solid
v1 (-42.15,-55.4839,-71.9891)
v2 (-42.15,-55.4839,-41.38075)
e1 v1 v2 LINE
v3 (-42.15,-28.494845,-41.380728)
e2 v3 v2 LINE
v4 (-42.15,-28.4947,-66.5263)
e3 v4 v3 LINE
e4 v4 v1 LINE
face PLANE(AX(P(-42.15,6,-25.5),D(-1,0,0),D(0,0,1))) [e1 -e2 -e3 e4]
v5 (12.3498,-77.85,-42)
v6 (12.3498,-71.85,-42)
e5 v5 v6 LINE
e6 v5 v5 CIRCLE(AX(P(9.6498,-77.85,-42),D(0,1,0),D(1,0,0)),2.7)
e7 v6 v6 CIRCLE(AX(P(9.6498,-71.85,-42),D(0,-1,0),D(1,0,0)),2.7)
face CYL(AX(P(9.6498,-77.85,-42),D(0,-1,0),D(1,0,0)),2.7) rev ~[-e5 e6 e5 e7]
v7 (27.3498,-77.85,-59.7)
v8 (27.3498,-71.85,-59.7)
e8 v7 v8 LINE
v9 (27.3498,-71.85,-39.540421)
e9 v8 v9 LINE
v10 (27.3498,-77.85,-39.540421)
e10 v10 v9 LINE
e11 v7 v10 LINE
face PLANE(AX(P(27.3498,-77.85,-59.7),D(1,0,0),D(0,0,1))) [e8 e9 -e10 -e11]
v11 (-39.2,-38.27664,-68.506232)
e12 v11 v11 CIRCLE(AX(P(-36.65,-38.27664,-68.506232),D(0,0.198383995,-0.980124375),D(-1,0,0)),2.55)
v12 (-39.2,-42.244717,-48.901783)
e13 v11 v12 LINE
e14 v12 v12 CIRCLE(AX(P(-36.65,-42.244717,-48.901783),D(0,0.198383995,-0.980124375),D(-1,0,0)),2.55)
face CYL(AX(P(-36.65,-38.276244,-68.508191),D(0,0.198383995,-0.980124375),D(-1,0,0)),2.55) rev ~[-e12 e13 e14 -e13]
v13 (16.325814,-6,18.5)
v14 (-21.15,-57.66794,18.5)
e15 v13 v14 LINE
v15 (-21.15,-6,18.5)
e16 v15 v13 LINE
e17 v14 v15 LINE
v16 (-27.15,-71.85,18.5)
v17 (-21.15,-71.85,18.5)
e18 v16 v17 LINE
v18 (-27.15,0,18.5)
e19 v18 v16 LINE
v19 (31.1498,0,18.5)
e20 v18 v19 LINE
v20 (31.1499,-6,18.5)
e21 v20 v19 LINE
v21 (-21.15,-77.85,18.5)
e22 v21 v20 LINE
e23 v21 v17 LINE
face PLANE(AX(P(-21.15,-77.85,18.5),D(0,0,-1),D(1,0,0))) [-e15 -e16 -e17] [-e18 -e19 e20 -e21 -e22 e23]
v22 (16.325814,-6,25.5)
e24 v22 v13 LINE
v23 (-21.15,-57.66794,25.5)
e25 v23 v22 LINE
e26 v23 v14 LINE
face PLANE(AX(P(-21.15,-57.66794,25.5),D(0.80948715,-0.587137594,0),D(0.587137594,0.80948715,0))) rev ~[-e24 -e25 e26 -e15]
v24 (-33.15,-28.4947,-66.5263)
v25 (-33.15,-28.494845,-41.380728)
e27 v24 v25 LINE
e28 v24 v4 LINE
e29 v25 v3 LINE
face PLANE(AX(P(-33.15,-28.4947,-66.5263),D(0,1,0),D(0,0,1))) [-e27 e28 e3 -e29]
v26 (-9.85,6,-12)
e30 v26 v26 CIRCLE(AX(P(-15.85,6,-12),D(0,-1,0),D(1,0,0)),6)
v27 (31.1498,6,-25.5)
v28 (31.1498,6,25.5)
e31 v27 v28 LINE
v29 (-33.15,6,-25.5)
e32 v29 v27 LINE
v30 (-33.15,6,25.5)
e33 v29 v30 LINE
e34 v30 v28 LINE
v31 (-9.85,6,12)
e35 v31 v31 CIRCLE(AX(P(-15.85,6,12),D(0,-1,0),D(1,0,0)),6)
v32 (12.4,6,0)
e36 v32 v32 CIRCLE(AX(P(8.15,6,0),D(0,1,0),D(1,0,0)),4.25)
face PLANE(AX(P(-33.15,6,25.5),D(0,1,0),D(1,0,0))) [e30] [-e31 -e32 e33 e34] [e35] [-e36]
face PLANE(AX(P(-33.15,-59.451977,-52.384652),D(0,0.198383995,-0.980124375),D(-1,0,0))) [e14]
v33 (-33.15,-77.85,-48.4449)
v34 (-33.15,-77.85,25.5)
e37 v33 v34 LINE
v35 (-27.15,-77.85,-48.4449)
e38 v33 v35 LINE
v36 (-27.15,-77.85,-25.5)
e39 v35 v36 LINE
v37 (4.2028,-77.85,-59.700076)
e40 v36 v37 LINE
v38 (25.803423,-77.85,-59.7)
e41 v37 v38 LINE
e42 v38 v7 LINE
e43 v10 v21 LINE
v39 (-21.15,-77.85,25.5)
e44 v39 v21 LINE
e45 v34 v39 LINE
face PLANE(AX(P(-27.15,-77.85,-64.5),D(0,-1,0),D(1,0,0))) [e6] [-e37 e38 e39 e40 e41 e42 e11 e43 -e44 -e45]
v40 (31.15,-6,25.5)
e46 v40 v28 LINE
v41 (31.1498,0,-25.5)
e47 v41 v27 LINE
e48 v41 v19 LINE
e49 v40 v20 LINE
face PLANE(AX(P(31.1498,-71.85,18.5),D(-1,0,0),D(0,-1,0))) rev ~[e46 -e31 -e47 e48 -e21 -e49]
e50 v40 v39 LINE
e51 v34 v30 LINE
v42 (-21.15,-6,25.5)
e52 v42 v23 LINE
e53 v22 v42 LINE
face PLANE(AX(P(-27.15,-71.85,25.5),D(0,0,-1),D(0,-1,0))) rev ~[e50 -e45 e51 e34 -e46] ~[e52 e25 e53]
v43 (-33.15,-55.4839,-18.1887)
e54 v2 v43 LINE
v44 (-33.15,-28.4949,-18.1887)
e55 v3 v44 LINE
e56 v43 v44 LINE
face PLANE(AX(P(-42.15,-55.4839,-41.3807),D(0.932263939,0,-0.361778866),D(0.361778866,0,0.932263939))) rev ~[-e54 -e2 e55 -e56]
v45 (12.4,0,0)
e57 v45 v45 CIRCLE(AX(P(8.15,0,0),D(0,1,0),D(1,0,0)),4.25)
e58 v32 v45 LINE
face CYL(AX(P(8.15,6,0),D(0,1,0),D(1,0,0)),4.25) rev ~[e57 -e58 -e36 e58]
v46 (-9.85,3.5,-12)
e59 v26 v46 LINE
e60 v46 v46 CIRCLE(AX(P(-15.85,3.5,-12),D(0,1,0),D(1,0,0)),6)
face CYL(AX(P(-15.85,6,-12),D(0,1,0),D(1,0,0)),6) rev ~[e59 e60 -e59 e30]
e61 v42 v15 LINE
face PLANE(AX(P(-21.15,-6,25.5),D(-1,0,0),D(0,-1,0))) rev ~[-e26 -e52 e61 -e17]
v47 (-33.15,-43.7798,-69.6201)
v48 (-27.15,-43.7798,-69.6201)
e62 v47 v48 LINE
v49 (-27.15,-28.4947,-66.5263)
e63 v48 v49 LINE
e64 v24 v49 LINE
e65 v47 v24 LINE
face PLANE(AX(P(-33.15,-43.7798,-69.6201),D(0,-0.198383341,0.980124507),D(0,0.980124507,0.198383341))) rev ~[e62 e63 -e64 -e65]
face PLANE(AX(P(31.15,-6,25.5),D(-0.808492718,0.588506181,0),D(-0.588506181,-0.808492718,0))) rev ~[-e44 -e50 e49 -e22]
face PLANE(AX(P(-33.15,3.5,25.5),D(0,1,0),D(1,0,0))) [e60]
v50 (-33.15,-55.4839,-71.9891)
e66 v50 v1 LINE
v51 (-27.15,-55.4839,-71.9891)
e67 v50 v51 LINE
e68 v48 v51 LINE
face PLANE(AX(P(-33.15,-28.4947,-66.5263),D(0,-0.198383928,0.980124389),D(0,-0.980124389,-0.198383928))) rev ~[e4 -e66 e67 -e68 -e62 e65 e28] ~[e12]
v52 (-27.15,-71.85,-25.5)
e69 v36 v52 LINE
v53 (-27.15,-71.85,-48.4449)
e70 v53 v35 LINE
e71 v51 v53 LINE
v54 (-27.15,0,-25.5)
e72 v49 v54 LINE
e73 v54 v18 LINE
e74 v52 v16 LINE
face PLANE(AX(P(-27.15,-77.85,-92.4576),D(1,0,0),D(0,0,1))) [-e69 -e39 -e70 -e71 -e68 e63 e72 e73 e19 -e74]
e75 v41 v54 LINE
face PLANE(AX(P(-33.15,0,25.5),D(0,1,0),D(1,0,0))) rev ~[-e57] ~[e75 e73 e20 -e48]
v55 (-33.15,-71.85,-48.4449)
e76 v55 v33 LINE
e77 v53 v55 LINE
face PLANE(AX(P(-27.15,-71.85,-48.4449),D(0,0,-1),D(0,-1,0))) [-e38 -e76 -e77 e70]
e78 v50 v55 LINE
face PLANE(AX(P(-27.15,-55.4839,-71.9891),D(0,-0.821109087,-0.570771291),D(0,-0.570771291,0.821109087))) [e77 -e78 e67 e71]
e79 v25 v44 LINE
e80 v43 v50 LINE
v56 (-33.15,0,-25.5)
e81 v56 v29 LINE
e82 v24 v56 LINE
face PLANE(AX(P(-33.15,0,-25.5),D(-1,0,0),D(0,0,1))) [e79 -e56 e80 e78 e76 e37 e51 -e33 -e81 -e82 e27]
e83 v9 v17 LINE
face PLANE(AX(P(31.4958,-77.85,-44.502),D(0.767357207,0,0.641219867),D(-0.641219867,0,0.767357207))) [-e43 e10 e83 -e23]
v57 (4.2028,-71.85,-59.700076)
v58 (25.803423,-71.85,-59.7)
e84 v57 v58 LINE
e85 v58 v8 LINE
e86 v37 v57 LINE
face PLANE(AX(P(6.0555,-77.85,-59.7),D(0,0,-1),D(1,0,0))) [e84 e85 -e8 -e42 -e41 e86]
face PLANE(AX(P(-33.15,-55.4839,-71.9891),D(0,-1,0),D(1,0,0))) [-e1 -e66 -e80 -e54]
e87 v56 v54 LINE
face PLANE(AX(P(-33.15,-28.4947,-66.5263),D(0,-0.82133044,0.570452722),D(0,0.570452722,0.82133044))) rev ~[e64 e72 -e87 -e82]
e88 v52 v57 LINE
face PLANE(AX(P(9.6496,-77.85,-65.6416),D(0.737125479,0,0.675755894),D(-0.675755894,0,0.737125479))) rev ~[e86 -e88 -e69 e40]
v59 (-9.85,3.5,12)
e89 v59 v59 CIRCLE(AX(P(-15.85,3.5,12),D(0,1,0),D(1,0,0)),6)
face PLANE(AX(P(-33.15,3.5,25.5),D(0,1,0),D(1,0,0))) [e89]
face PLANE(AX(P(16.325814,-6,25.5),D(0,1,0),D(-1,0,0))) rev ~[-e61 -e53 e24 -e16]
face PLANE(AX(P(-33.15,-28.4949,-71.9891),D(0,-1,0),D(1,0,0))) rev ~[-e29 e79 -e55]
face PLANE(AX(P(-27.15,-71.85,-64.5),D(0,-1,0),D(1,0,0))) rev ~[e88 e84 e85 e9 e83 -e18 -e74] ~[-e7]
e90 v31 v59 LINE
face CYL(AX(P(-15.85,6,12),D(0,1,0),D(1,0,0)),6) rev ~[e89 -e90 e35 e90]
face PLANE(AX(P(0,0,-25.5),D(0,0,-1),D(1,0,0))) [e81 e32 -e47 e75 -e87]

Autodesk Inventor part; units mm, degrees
ref_plane "YZ Plane" through (0, 0, 0) normal (1, 0, 0) x (0, 1, 0)
ref_plane "XZ Plane" through (0, 0, 0) normal (0, 1, 0) x (-1, 0, 0)
ref_plane "XY Plane" through (0, 0, 0) normal (0, 0, 1) x (1, 0, 0)
sketch "Sketch1" plane through (0, 0, 0) normal (0, 1, 0) x (-1, 0, 0)
  line L0 (0, -25.5) -> (-34.15, -25.5)
  line L1 (-34.15, -25.5) -> (-34.15, 0)
  line L2 (-34.15, 0) -> (-34.15, 25.5)
  line L3 (-34.15, 25.5) -> (0, 25.5)
  line L4 (0, 25.5) -> (34.15, 25.5)
  line L5 (34.15, 25.5) -> (34.15, 0)
  line L6 (34.15, 0) -> (34.15, -25.5)
  line L7 (34.15, -25.5) -> (0, -25.5)
  point P0 (0, 0)
extrude "Extrusion1" add sketch "Sketch1" along normal blind 7
sketch "Sketch3" plane through (-34.15, 0, 25.5) normal (0, 0, 1) x (1, 0, 0)
  line L0 (0, 0) -> (0, -78.85)
  point P0 (34.15, 0)
  dimension "d7" = 78.85
sketch "Sketch4" plane through (-34.15, 0, -25.5) normal (-1, 0, 0) x (0, 0, 1)
  line L0 (51, 0) -> (51, -78.85)
  line L1 (51, -78.85) -> (-39, -78.85)
  line L2 (-39, -78.85) -> (-39, -71.85)
  line L3 (0, 0) -> (-39, -71.85)
  line L4 (0, 0) -> (51, 0)
  point P0 (25.5, 0)
  dimension "d10" = 90
  dimension "d11" = 7
extrude "Extrusion2" add sketch "Sketch4" against normal blind 7
sketch "Sketch6" plane through (0, 7, 0) normal (0, 1, 0) x (1, 0, 0)
  line L0 (34.15, -25.5) -> (34.15, 25.5) projected
  line L1 (34.15, 25.5) -> (34.15, 0)
  line L2 (-34.15, 25.5) -> (-34.15, -25.5) projected
  circle A0 centre (8.15, 0) radius 5
  point P0 (0, 0)
  dimension "d20" = 10
extrude "Extrusion4" cut sketch "Sketch6" against normal blind 10
sketch "Sketch7" plane through (-27.15, 0, -25.5) normal (1, 0, 0) x (0, 0, -1)
  line L0 (-51, -78.85) -> (39, -78.85) projected
  line L1 (-51, -78.85) -> (39, -78.85)
  line L2 (39, -78.85) -> (39, -71.85) projected
  line L3 (39, -78.85) -> (39, -71.85)
  line L4 (39, -71.85) -> (-51, -71.85)
  line L5 (-51, 0) -> (-51, -78.85) projected
  line L6 (-51, -78.85) -> (-51, -71.85)
  point P0 (-25.5, 0)
sketch "Sketch8" plane through (0, 0, 0) normal (0, -1, 0) x (1, 0, 0)
  circle A0 centre (8.15, 0) radius 5 projected
  line L0 (8.15, 18.5) -> (34.15, 18.5)
  line L1 (34.15, 25.5) -> (34.15, -25.5) projected
  line L2 (8.15, 25.5) -> (34.15, 25.5)
  line L3 (8.15, 25.5) -> (-27.15, 25.5)
  line L4 (-27.15, 25.5) -> (-27.15, -25.5) projected
  line L5 (8.15, 18.5) -> (-27.15, 18.5)
  line L6 (34.15, 25.5) -> (34.15, 18.5)
  line L7 (-27.15, 25.5) -> (-27.15, 18.5)
  point P0 (0, 0)
extrude "Extrusion6" add sketch "Sketch7" along normal blind 58.5
extrude "Extrusion7" add sketch "Sketch8" along normal blind 78.75 contours L5 L4 L3 L2 L1 L0
sketch "Sketch9" plane through (31.35, 0, -25.5) normal (1, 0, 0) x (0, 0, -1)
  line L0 (-51, -78.75) -> (-51, 7) projected
  line L1 (-44, 0) -> (-44, -71.85) projected
  line L2 (-51, -78.75) -> (-44, -78.75)
  line L3 (-44, -78.75) -> (-44, -71.85)
  line L4 (-44, -71.85) -> (-51, -71.85)
  line L5 (-51, -71.85) -> (-51, -78.75)
  point P0 (-25.5, 0)
extrude "Extrusion8" cut sketch "Sketch9" along normal blind 10
sketch "Sketch10" plane through (0, 7, 0) normal (0, 1, 0) x (1, 0, 0)
  point P0 (0, 0)
sketch "Boceto11" plane through (-34.15, -78.85, -64.5) normal (0, -1, 0) x (1, 0, 0)
  line L0 (72.0718, 89.9914) -> (72.0718, 37.9883)
  line L1 (72.0718, 37.9883) -> (65.5278, 37.9883)
  line L2 (65.5278, 37.9883) -> (65.5278, 89.9914)
  line L3 (72.0718, 89.9914) -> (72.0718, 92.1751)
  line L4 (72.0718, 92.1751) -> (65.5278, 92.1751)
  line L5 (65.5278, 92.1751) -> (65.5278, 89.9914)
  point P0 (34.15, 64.5)
extrude "Extrusión9" cut sketch "Boceto11" against normal blind 1000
sketch "Boceto18" plane through (-34.15, -78.85, 25.5) normal (0, 0, 1) x (1, 0, 0)
  point P0 (34.15, 78.85)
sketch "Boceto23" plane through (-27.15, 0, -25.5) normal (0, 0.4770514, -0.8788754) x (-1, 0, 0)
  point P0 (-27.15, 12.1648)
sketch "Boceto24" plane through (-27.15, 0, -25.5) normal (0, 0, -1) x (-1, 0, 0)
  line L0 (7, -71.85) -> (7, -78.85) projected
  line L1 (7, -78.35) -> (7, -78.85)
  line L2 (7, -78.85) -> (-58.5, -78.85) projected
  line L3 (-58.5, -78.85) -> (-58.5, -77.85)
  line L4 (-58.5, -71.85) -> (-58.5, -78.85) projected
  line L5 (-58.5, -77.85) -> (6, -77.85)
  line L6 (7, -77.85) -> (7, -78.85)
  line L7 (7, -78.85) -> (-58.8392, -78.85)
  line L8 (-58.5278, 7) -> (7, 7) projected
  line L9 (7, -78.85) -> (7, 7)
  line L10 (7, 7) -> (6, 7)
  line L11 (6, 6) -> (6, -77.85)
  line L12 (-58.5278, -71.85) -> (-58.5278, 7) projected
  line L13 (-58.5278, 7) -> (-58.5278, 6)
  line L14 (-58.5278, 6) -> (6, 6)
  line L15 (7, 0) -> (7, 7) projected
  line L16 (7, 6) -> (7, 7)
  line L17 (7, 7) -> (-58.5278, 7)
  point P0 (-27.15, 0)
  dimension "d65" = 1
  dimension "d66" = 1
  dimension "d67" = 1
extrude "Extrusión19" cut sketch "Boceto24" along normal mid plane 1000
sketch "Boceto25" plane through (31.35, -71.85, -64.5) normal (0, 0, -1) x (-1, 0, 0)
  point P0 (31.35, 71.85)
sketch "Boceto27" plane through (31.3778, 0, -25.5) normal (0, 0, -1) x (-1, 0, 0)
  line L0 (0, -71.85) -> (0, 6) projected
  line L1 (0, 6) -> (0.228, 6)
  line L2 (0, 6) -> (64.5278, 6) projected
  line L3 (0.228, 6) -> (0.228, -77.85)
  line L4 (0.0278, -77.85) -> (64.5278, -77.85) projected
  line L5 (0.0278, -71.85) -> (0.0278, -77.85) projected
  line L6 (0.228, -77.85) -> (0.0278, -77.85)
  line L7 (0.0278, -77.85) -> (0, 6)
  line L8 (0, 6) -> (0, -77.85)
  line L9 (0, -77.85) -> (0.0278, -77.85)
  point P0 (31.3778, 0)
  dimension "d73" = 0.228
extrude "Extrusión21" cut sketch "Boceto27" along normal mid plane 1000
sketch "Boceto28" plane through (-33.15, 0, -25.5) normal (-1, 0, 0) x (0, 0, 1)
  point P0 (25.5, 0)
sketch "Boceto30" plane through (-33.15, 0, -25.5) normal (-1, 0, 0) x (0, 0, 1)
  point P0 (25.5, 0)
sketch "Boceto31" plane through (-33.15, 0, -25.5) normal (-1, 0, 0) x (0, 0, 1)
  circle A0 centre (64.38, -38.5153) radius 2.6
  point P0 (25.5, 0)
  point P1 (64.38, -49.4573)
sketch "Boceto32" plane through (-27.15, -71.85, 18.5) normal (0, 1, 0) x (1, 0, 0)
  circle A0 centre (47, 71.5) radius 5 projected
  circle A1 centre (47, 71.5) radius 5
  line L0 (52, 71.5) -> (58.2998, 71.5)
  line L1 (67, 83) -> (67, -7)
  line L2 (58.2998, -7) -> (-6, -7) projected
  line L3 (67, -7) -> (58.2998, -7)
  line L4 (58.2998, -7) -> (58.2998, 83)
  line L5 (47, 76.5) -> (47, 83)
  line L6 (-6, 83) -> (0, 83) projected
  line L7 (-6, 83) -> (-6, 91.5)
  line L8 (-6, 91.5) -> (67, 91.5)
  line L9 (67, 91.5) -> (67, 83)
  line L10 (-6, 83) -> (58.2998, 83)
  point P0 (27.15, 18.5)
extrude "Extrusión23" add sketch "Boceto32" against normal blind 6 contours L4 L10 L6 L7 L8 L9 L1 L3
sketch "Boceto33" plane through (-33.15, -77.85, 25.5) normal (-1, 0, 0) x (0, 0, 1)
  line L0 (0, 83.85) -> (0, 0) projected
  line L1 (0, 74.4354) -> (10.1255, 74.4354)
  line L2 (10.1255, 74.4354) -> (10.1255, 56.6115)
  line L3 (10.9445, 54.9975) -> (18.0243, 49.8171)
  line L4 (18.8039, 48.5979) -> (20.1084, 42.1205)
  line L5 (0, 11.6181) -> (18.1478, 11.6181)
  line L6 (20.1478, 13.6181) -> (20.1478, 41.7256)
  arc A0 (10.1255, 56.6115) -> (10.9445, 54.9975) centre (12.1255, 56.6115) ccw
  arc A1 (18.8039, 48.5979) -> (18.0243, 49.8171) centre (16.8433, 48.203) ccw
  arc A2 (20.1478, 41.7256) -> (20.1084, 42.1205) centre (18.1478, 41.7256) ccw
  arc A3 (18.1478, 11.6181) -> (20.1478, 13.6181) centre (18.1478, 13.6181) ccw
  point P0 (-25.5, 77.85)
  dimension "d91" = 2
extrude "Extrusión24" add sketch "Boceto33" against normal blind 6
extrude "Extrusión25" cut sketch "Boceto31" against normal blind 6
sketch "Boceto34" plane through (-27.15, -77.85, 25.5) normal (1, 0, 0) x (0, 0, -1)
  line L0 (-18.1478, 11.6181) -> (-21.8775, 11.6181)
  line L1 (-21.8775, 11.6181) -> (-21.8775, 48.067)
  line L2 (-21.8775, 48.067) -> (-10.1255, 56.8358)
  line L3 (-10.1255, 74.4354) -> (-10.1255, 56.6115) projected
  line L4 (-10.1255, 56.8358) -> (-10.1255, 48.9642)
  line L5 (-10.1255, 48.9642) -> (-16.6729, 42.1735)
  line L6 (-16.6729, 42.1735) -> (-18.1478, 11.6181)
  point P0 (25.5, 77.85)
extrude "Extrusión26" add sketch "Boceto34" against normal blind 6
fillet "Empalme5" radius 10 3 edges at (-30.15, -21.0142, 35.6255) (-30.15, -29.783, 47.3775) (-30.15, -66.2319, 47.3775)
sketch "Boceto37" plane through (-33.15, 6, 25.5) normal (0, 1, 0) x (1, 0, 0)
  circle A0 centre (41.3, 25.5) radius 6 projected
  line L0 (41.3, 25.5) -> (17.3, 25.5)
  line L1 (17.3, 25.5) -> (17.3, 13.5)
  line L2 (17.3, 13.5) -> (17.3, 37.5)
  circle A1 centre (17.3, 13.5) radius 6
  circle A2 centre (17.3, 37.5) radius 6
  point P0 (33.15, 25.5)
  dimension "d106" = 24
  dimension "d107" = 12
  dimension "d108" = 24
  dimension "d109" = 12
  dimension "d110" = 12
extrude "Extrusión29" cut sketch "Boceto37" against normal blind 2.5 contours A1 | A2
sketch "Boceto39" plane through (-27.15, -71.85, 18.5) normal (0, 1, 0) x (1, 0, 0)
  line L0 (58.2998, -7) -> (58.2998, 0)
  line L1 (58.2998, 44) -> (58.2998, 91.5)
  line L2 (-6, 91.5) -> (67, 91.5) projected
  line L3 (0, 0) -> (58.2998, 0) projected
  line L4 (58.2998, 0) -> (58.2998, -7) projected
  line L5 (58.2998, -7) -> (67, -7) projected
  line L6 (58.2998, -7) -> (67, -7)
  line L7 (67, 91.5) -> (-6, 91.5) projected
  line L8 (67, -7) -> (67, 91.5)
  line L9 (67, 91.5) -> (58.2998, 91.5)
  line L10 (58.2998, 0) -> (58.2998, 44)
  point P0 (27.15, 18.5)
extrude "Extrusión31" cut sketch "Boceto39" against normal blind 10
sketch "Boceto41" plane through (-27.15, -71.85, 18.5) normal (0, 1, 0) x (1, 0, 0)
  line L0 (58.2998, 91.5) -> (58.2998, -7) projected
  line L1 (58.2998, 91.5) -> (31.7998, 91.5)
  line L2 (31.7998, 91.5) -> (31.7998, 65)
  line L3 (31.7998, 65) -> (58.2998, 65)
  line L4 (58.2998, 65) -> (58.2998, 91.5)
  circle A0 centre (31.7998, 65) radius 6
  point P0 (27.15, 18.5)
  dimension "d124" = 26.5
  dimension "d125" = 26.5
  dimension "d126" = 12
extrude "Extrusión32" cut sketch "Boceto41" against normal blind 10 contours A0 L2 L3 | L3 L2 A0
sketch "Sketch42" plane through (-27.15, -71.85, 18.5) normal (0, 1, 0) x (1, 0, 0)
  circle A0 centre (31.7998, 65) radius 6 projected
  line L0 (31.7998, 71) -> (31.7998, 65)
  circle A1 centre (31.7998, 65) radius 18
  line L1 (0, 0) -> (0, 83) projected
  line L2 (0, 83) -> (31.7998, 83)
  line L3 (58.2998, 91.5) -> (-6, 91.5) projected
  line L4 (49.7998, 65) -> (49.7998, 0)
  line L5 (58.2998, 0) -> (0, 0) projected
  line L6 (0, 0) -> (58.2998, 0) projected
  line L7 (49.7998, 0) -> (58.2998, 0)
  line L8 (58.2998, 91.5) -> (58.2998, -7) projected
  line L9 (58.2998, 0) -> (58.2998, 91.5)
  line L10 (0, 83) -> (0, 44) projected
  line L11 (0, 83) -> (-6, 83)
  line L12 (-6, 91.5) -> (-6, 83) projected
  line L13 (-6, 83) -> (-6, 91.5)
  line L14 (58.2998, 91.5) -> (58.2998, 0) projected
  line L15 (-6, 91.5) -> (58.2998, 91.5)
  point P0 (27.15, 18.5)
  point P1 (58.2998, -7)
  dimension "d129" = 36
extrude "Extrusion33" cut sketch "Sketch42" against normal blind 10 contours A1 L2 L11 L12 L3 L8 L5 L4
sketch "Sketch43" plane through (-27.15, -71.85, 18.5) normal (0, 0, -1) x (-1, 0, 0)
  line L0 (6, -6) -> (-58.2998, -6) projected
  line L1 (0, 0) -> (-49.7998, 0) projected
  line L2 (-58.2998, -6) -> (-49.7998, -6)
  line L3 (-49.7998, -6) -> (-49.7998, 0)
  line L4 (-49.7998, 0) -> (-58.2998, 0)
  line L5 (-58.2998, 0) -> (-58.2998, -6)
  point P0 (-27.15, 71.85)
extrude "Extrusion34" add sketch "Sketch43" along normal blind 20
fillet "Fillet7" radius 7 1 edges at (31.1498, -74.85, -1.5)
fillet "Fillet8" radius 2 1 edges at (22.6498, -74.85, -1.5)
sketch "Sketch44" plane through (-33.15, 0, -25.5) normal (-1, 0, 0) x (0, 0, 1)
  line L0 (68.8577, -26.7837) -> (65.1452, -24.0136) projected
  line L1 (61.1255, -3.4146) -> (51, -3.4146) projected
  line L2 (65.1452, -24.0136) -> (51, -24.0136)
  line L3 (51, -24.0136) -> (51, -3.4146)
  line L4 (51, -3.4146) -> (65.1452, -3.4146)
  line L5 (65.1452, -3.4146) -> (65.1452, -24.0136)
  point P0 (25.5, 0)
extrude "Extrusion35" cut sketch "Sketch44" against normal blind 20
sketch "Sketch45" plane through (-33.15, 6, 25.5) normal (0, 1, 0) x (1, 0, 0)
  circle A0 centre (41.3, 25.5) radius 5 projected
  circle A1 centre (41.3, 25.5) radius 4.25
  circle A2 centre (41.3, 25.5) radius 5
  point P0 (33.15, 25.5)
  dimension "d138" = 8.5
extrude "Extrusion36" add sketch "Sketch45" against normal blind 6
sketch "Sketch46" plane through (-33.15, 0, -25.5) normal (-1, 0, 0) x (0, 0, 1)
  point P0 (25.5, 0)
sketch "Sketch47" plane through (-33.15, 0, -25.5) normal (-1, 0, 0) x (0, 0, 1)
  line L0 (-44.1201, -43.7798) -> (-41.0263, -28.4947)
  line L1 (-39, -71.85) -> (0, 0) projected
  line L2 (-41.0263, -28.4947) -> (0, 0)
  line L3 (0, 0) -> (-39, -71.85)
  line L4 (-44.1201, -43.7798) -> (-44.1201, -71.85)
  line L5 (-44.1201, -71.85) -> (-39, -71.85)
  point P0 (25.5, 0)
extrude "Extrusion37" add sketch "Sketch47" against normal blind 6
sketch "Sketch48" plane through (-33.15, 6, -25.5) normal (-1, 0, 0) x (0, 0, 1)
  point P0 (25.5, -6)
sketch "Sketch49" plane through (-33.15, 6, -25.5) normal (-1, 0, 0) x (0, 0, 1)
  point P0 (25.5, -6)
sketch "Sketch50" plane through (-33.15, 6, -25.5) normal (-1, 0, 0) x (0, 0, 1)
  line L0 (-44.1201, -49.7798) -> (-41.0263, -34.4947) projected
  line L1 (-41.0263, -34.4947) -> (-46.4891, -61.4839)
  line L2 (-39, -83.85) -> (51, -83.85) projected
  line L3 (-39, -83.85) -> (-46.4891, -83.85)
  line L4 (-46.4891, -83.85) -> (-46.4891, -61.4839)
  line L5 (-41.0263, -34.4947) -> (-39, -69.2782)
  line L6 (-39, -69.2782) -> (-39, -83.85)
  point P0 (25.5, -6)
extrude "Extrusion38" add sketch "Sketch50" against normal blind 6
sketch "Sketch51" plane through (-33.15, 6, -25.5) normal (-1, 0, 0) x (0, 0, 1)
  line L0 (-41.0263, -34.4947) -> (-46.4891, -61.4839) projected
  line L1 (-41.0263, -34.4947) -> (-46.4891, -61.4839)
  line L2 (-46.4891, -61.4839) -> (-15.8808, -61.4839)
  line L3 (-41.0263, -34.4947) -> (-15.8808, -34.4947)
  line L4 (-15.8808, -34.4947) -> (-15.8808, -61.4839)
  point P0 (25.5, -6)
extrude "Extrusion39" add sketch "Sketch51" along normal blind 9
sketch "Sketch52" plane through (-33.15, -55.4839, -71.9891) normal (0, -1, 0) x (1, 0, 0)
  line L0 (-9, 30.6084) -> (0, 53.8004)
  line L1 (0, 0) -> (0, 97.4891) projected
  line L2 (0, 30.6084) -> (0, 53.8004)
  line L3 (0, 30.6084) -> (-9, 30.6084)
  point P0 (33.15, 71.9891)
extrude "Extrusion40" add sketch "Sketch52" against normal blind 26.989
sketch "Sketch53" plane through (-33.15, -55.4839, -18.1887) normal (-0.9322642, 0, 0.3617781) x (0.3617781, 0, 0.9322642)
  point P0 (28.9496, 55.4839)
sketch "Sketch54" plane through (-33.15, 6, -25.5) normal (-1, 0, 0) x (0, 0, 1)
  line L0 (51, -72.2319) -> (51, -83.85) projected
  line L1 (51, -83.85) -> (86.3988, -83.85)
  line L2 (86.3988, -83.85) -> (86.3988, -18.2813)
  line L3 (86.3988, -18.2813) -> (51, -18.2813)
  line L4 (51, -18.2813) -> (51, -83.85)
  point P0 (25.5, -6)
extrude "Extrusion41" cut sketch "Sketch54" against normal blind 26.989
sketch "Sketch55" plane through (-33.15, -55.4839, -71.9891) normal (0, 0.198384, -0.9801244) x (-1, 0, 0)
  line L0 (9, 6.0722) -> (9, 32.5248) projected
  line L1 (9, 17.5562) -> (3.5, 17.5562)
  line L2 (9, 17.5562) -> (14.5, 17.5562) construction
  circle A0 centre (3.5, 17.5562) radius 2.55
  point P0 (-33.15, 68.6627)
  dimension "d153" = 5.5
  dimension "d154" = 180
  dimension "d155" = 5.1
extrude "Extrusion42" cut sketch "Sketch55" against normal blind 20
sketch "Sketch56" plane through (-33.15, -77.85, 25.5) normal (0, 0, 1) x (1, 0, 0)
  line L0 (0, 77.85) -> (0, 83.85) projected
  line L1 (0, 83.85) -> (12, 83.85)
  line L2 (64.2998, 83.85) -> (0, 83.85) projected
  line L3 (12, 83.85) -> (12, 0)
  line L4 (6, 0) -> (37.7998, 0) projected
  line L5 (0, 83.85) -> (0, 0) projected
  line L6 (12, 0) -> (0, 0)
  line L7 (0, 0) -> (0, 83.85)
  line L8 (0, 83.85) -> (12, 83.85)
  line L9 (12, 83.85) -> (12, 0)
  line L10 (0, 83.85) -> (64.3, 83.85)
  line L11 (64.3, 83.85) -> (64.3, 71.85)
  line L12 (64.3, 71.85) -> (0, 71.85)
  line L13 (0, 71.85) -> (0, 83.85)
  line L14 (64.2998, 0) -> (64.2998, 83.85) projected
  line L15 (64.3, 71.85) -> (12, 0)
  line L16 (64.3, 71.85) -> (54.5981, 78.9121)
  line L17 (12, 0) -> (3.5198, 8.4904)
  line L18 (3.5198, 8.4904) -> (54.5981, 78.9121)
  line L19 (12, 0) -> (64.2998, 0)
  line L20 (64.3, 71.85) -> (64.2998, 0)
  point P0 (33.15, 77.85)
  point P1 (37.7998, 0)
  point P2 (64.2998, 71.8497)
  point P3 (12, 20.182)
  point P4 (49.4758, 71.85)
  point P5 (12, 71.85)
  dimension "d158" = 12
  dimension "d159" = 64.3
  dimension "d160" = 12
  dimension "d161" = 12
  dimension "d162" = 12
extrude "Extrusion43" cut sketch "Sketch56" against normal blind 20 contours L12 L18 L3 | L14 L19 L4 L15
sketch "Sketch57" plane through (-27.15, -77.85, -64.5) normal (0, -1, 0) x (1, 0, 0)
  point P0 (27.15, 64.5)
sketch "Sketch58" plane through (-27.15, -77.85, -64.5) normal (0, -1, 0) x (1, 0, 0)
  line L0 (0.0098, 82.9715) -> (6.0098, 82.9715)
  line L1 (0.0098, 82.9715) -> (58.6458, 82.9715)
  line L2 (58.6458, 82.9715) -> (58.6458, -19.949)
  line L3 (58.6458, -19.949) -> (0.0098, -19.949)
  line L4 (0.0098, -19.949) -> (0.0098, 82.9715)
  line L5 (58.6458, 1.7715) -> (22.1928, 1.7715)
  line L6 (22.1928, 1.7715) -> (0.0098, 16.0551)
  line L7 (0.0098, 16.0551) -> (0.0098, 82.9715)
  line L8 (58.6458, 1.7715) -> (58.6458, 39.0076)
  line L9 (58.6458, 1.7715) -> (22.1928, 1.7715)
  line L10 (58.6458, 38.2245) -> (58.6458, 1.7715)
  line L11 (58.6458, 38.2245) -> (6.0098, 82.9715)
  point P0 (15.0563, 101.6492)
extrude "Extrusion44" add sketch "Sketch58" against normal blind 6
extrude "Extrusion45" cut sketch "Sketch58" against normal blind 6
extrude "Extrusion46" add sketch "Sketch58" against normal blind 6 contours L0 L11 L2 L5 L6 L4
sketch "Sketch59" plane through (-27.15, 0, -25.5) normal (1, 0, 0) x (0, 0, -1)
  line L0 (46.4891, -77.85) -> (46.4891, -55.4839) projected
  line L1 (22.9449, -71.85) -> (22.9449, -77.85) projected
  line L2 (46.4891, -55.4839) -> (22.9449, -71.85)
  line L3 (22.9449, -71.85) -> (22.9449, -77.85)
  line L4 (22.9449, -77.85) -> (46.4891, -77.85)
  line L5 (46.4891, -55.4839) -> (46.4891, -77.85) projected
  line L6 (46.4891, -77.85) -> (46.4891, -55.4839)
  line L7 (46.4891, -55.4839) -> (46.4891, -77.85)
  point P0 (-25.5, 0)
extrude "Extrusion47" cut sketch "Sketch59" along normal blind 0.1 and the other way blind 6
sketch "Sketch60" plane through (-4.9572, -77.85, -62.7285) normal (0, -1, 0) x (1, 0, 0)
  line L0 (36.107, 88.2285) -> (-22.1928, 88.2285) projected
  line L1 (36.107, 88.2285) -> (14.607, 88.2285)
  line L2 (14.607, 88.2285) -> (14.607, 20.7285)
  line L3 (14.607, 20.7285) -> (36.107, 20.7285)
  line L4 (36.107, 20.7285) -> (36.107, 88.2285)
  circle A0 centre (14.607, 20.7285) radius 2.7
  point P0 (4.9572, 62.7285)
  dimension "d176" = 21.5
  dimension "d177" = 67.5
  dimension "d178" = 5.4
extrude "Extrusion48" cut sketch "Sketch60" against normal blind 10 contours A0 L3 L2 | L2 L3 A0
sketch "Sketch61" plane through (-33.15, -77.85, 25.5) normal (0, -1, 0) x (1, 0, 0)
  line L0 (64.6458, -51.7755) -> (64.6458, -88.2285) projected
  line L1 (64.6458, -88.2285) -> (64.6458, -70.002)
  line L2 (12, -7) -> (49.4758, -7) projected
  line L3 (64.6458, -70.002) -> (12, -7)
  line L4 (12, -7) -> (64.6458, -48.437)
  line L5 (64.6458, -48.437) -> (64.6458, -70.002)
  line L6 (64.6458, -88.2285) -> (46.4193, -88.2285)
  line L7 (6.1, -74.0029) -> (28.1928, -88.2285) projected
  line L8 (46.4193, -88.2285) -> (28.1928, -88.2285)
  line L9 (28.1928, -88.2285) -> (6.1, -61.7897)
  line L10 (6.1, -61.7897) -> (6.1, -74.0029)
  line L11 (6.1, -74.0029) -> (28.1928, -88.2285)
  point P0 (33.15, -25.5)
  dimension "d181" = 18.2265
  dimension "d182" = 18.2265
extrude "Extrusion49" cut sketch "Sketch61" against normal blind 6
sketch "Sketch62" plane through (-33.15, -28.4947, -66.5263) normal (0, 0.198384, -0.9801244) x (-1, 0, 0)
  point P0 (-33.15, 41.1261)
sketch "Sketch63" plane through (-33.15, -77.85, 25.5) normal (0, -1, 0) x (1, 0, 0)
  line L0 (6, -7) -> (6, -51) projected
  line L1 (6, -7) -> (12, -7) projected
  line L2 (12, -7) -> (64.6458, -70.002)
  circle A0 centre (42.7998, -67.5) radius 2.7 projected
  line L3 (64.6458, -70.002) -> (42.7998, -67.5)
  line L4 (42.7998, -67.5) -> (53.7228, -80.5717)
  line L5 (53.7228, -80.5717) -> (64.6458, -70.002)
  line L6 (53.7228, -80.5717) -> (42.7996, -91.1416)
  line L7 (42.7996, -91.1416) -> (6, -51)
  line L8 (42.7996, -91.1416) -> (64.6458, -91.1416)
  line L9 (64.6458, -91.1416) -> (64.6458, -70.002)
  line L10 (6, -7) -> (73.4518, -7)
  line L11 (73.4518, -7) -> (73.4518, -117.9576)
  line L12 (73.4518, -117.9576) -> (6, -117.9576)
  line L13 (6, -117.9576) -> (6, -7)
  point P0 (33.15, -25.5)
extrude "Extrusion50" cut sketch "Sketch63" against normal blind 6 contours L7 L8 L9 L2 L10 L11 L12 L13
extrude "Extrusion51" add sketch "Sketch63" against normal blind 6 contours L1 L2 L3 A0 L4 L6 L7 L0 | L6 L5 L9 L8 | L5 L4 A0 L3
sketch "Sketch64" plane through (-33.15, -77.85, 25.5) normal (0, -1, 0) x (1, 0, 0)
  circle A0 centre (42.7998, -67.5) radius 2.7 projected
  line L0 (42.7998, -67.5) -> (42.7998, -70.2)
  line L1 (42.7998, -70.2) -> (42.7998, -85.2)
  line L2 (12, -7) -> (49.4758, -7) projected
  line L3 (12, -7) -> (64.6458, -70.002) projected
  line L4 (12, -7) -> (64.6458, -70.002)
  line L5 (64.6458, -70.002) -> (64.6458, -91.1416) projected
  line L6 (64.6458, -70.002) -> (64.6458, -91.1416)
  line L7 (64.6458, -91.1416) -> (42.7998, -91.1416)
  line L8 (6, -7) -> (6, -51) projected
  line L9 (42.7998, -91.1416) -> (6, -51)
  line L10 (42.7998, -85.2) -> (64.6458, -85.2)
  line L11 (45.4998, -67.5) -> (60.4998, -67.5)
  line L12 (60.4998, -67.5) -> (60.4998, -85.2)
  line L13 (60.4998, -67.5) -> (60.4998, -65.0404)
  line L14 (42.7998, -85.2) -> (37.3528, -85.2)
  line L15 (37.3528, -85.2) -> (67.2046, -85.2)
  line L16 (67.2046, -85.2) -> (67.2046, -95.398)
  line L17 (67.2046, -95.398) -> (37.3528, -95.398)
  line L18 (37.3528, -95.398) -> (37.3528, -85.2)
  line L19 (60.4998, -85.2) -> (70.2528, -85.2)
  line L20 (70.2528, -85.2) -> (70.2528, -62.331)
  line L21 (70.2528, -62.331) -> (60.4998, -62.331)
  line L22 (60.4998, -62.331) -> (60.4998, -85.2)
  point P0 (33.15, -25.5)
  dimension "d192" = 15
  dimension "d193" = 15
extrude "Extrusion52" cut sketch "Sketch64" against normal blind 6 contours L13 L3 L5 L10 L12 | L10 L5 L7 L9 L14 | L22 L21 L20 L19 L15 L5 L3 | L9 L7 L5 L15 L16 L17 L18
sketch "Sketch65" plane through (-33.15, -77.85, 25.5) normal (0, -1, 0) x (1, 0, 0)
  line L0 (12, -7) -> (60.4998, -65.0404) projected
  line L1 (60.4998, -65.0404) -> (48.9264, -75.1202)
  line L2 (60.4998, -65.0404) -> (60.4998, -85.2) projected
  line L3 (60.4998, -65.0404) -> (60.4998, -85.2)
  line L4 (48.9264, -75.1202) -> (60.4998, -88.4085)
  line L5 (60.4998, -65.0404) -> (58.8524, -86.517)
  line L6 (58.8524, -86.517) -> (37.3528, -85.2002)
  line L7 (37.3528, -85.2002) -> (48.9264, -75.1202)
  line L8 (58.8524, -86.517) -> (69.5954, -86.517)
  line L9 (69.5954, -86.517) -> (69.5954, -59.5334)
  line L10 (69.5954, -59.5334) -> (58.8524, -59.5334)
  line L11 (58.8524, -59.5334) -> (58.8524, -86.517)
  point P0 (33.15, -25.5)
  point P1 (58.8524, -63.069)
  dimension "d196" = 15.3475
extrude "Extrusion53" cut sketch "Sketch65" against normal blind 6 contours L11 L10 L9 L8 L5 L0
extrude "Extrusion54" add sketch "Sketch65" against normal blind 6 contours L5 L11 L1 | L11 L4 L1 | L6 L7 L4
sketch "Sketch66" plane through (-33.15, -77.85, 25.5) normal (0, -1, 0) x (1, 0, 0)
  line L0 (37.3528, -85.2) -> (60.4998, -85.2)
  line L1 (60.4998, -85.2) -> (60.4998, -65.0404)
  line L2 (60.4998, -65.0404) -> (37.3528, -65.0404)
  line L3 (37.3528, -65.0404) -> (37.3528, -85.2)
  line L4 (74.8766, -52.5753) -> (26.3032, -52.5753)
  line L5 (26.3032, -52.5753) -> (26.3032, -106.4614)
  line L6 (26.3032, -106.4614) -> (74.8766, -106.4614)
  line L7 (74.8766, -106.4614) -> (74.8766, -52.5753)
  line L8 (60.4998, -52.5753) -> (60.4998, -85.2)
  line L9 (26.3032, -85.2) -> (39.2055, -85.2)
  line L10 (60.4998, -65.0404) -> (39.2055, -85.2)
  point P0 (33.15, -25.5)
extrude "Extrusion55" cut sketch "Sketch66" against normal blind 6 contours L0 L1 L8 L4 L7 L6 L5 L9
extrude "Extrusion56" add sketch "Sketch66" against normal blind 6 contours L10 L1 L0
sketch "Sketch67" plane through (-33.15, -77.85, 25.5) normal (0, -1, 0) x (1, 0, 0)
  point P0 (33.15, -25.5)
sketch "Sketch68" plane through (-33.15, -77.85, 25.5) normal (0, -1, 0) x (1, 0, 0)
  line L0 (60.4998, -65.0404) -> (60.4998, -85.2) projected
  line L1 (60.4998, -85.2) -> (37.3526, -85.2) projected
  line L2 (60.4998, -85.2) -> (37.3526, -85.2)
  line L3 (37.3526, -85.2) -> (6, -51)
  line L4 (6, -51) -> (6, -7)
  line L5 (6, -7) -> (12.2668, -7)
  line L6 (12, -7) -> (60.4998, -65.0404) projected
  line L7 (60.4998, -65.0404) -> (12, -7)
  circle A0 centre (42.7998, -67.5) radius 2.7 projected
  circle A1 centre (42.7998, -67.5) radius 2.7
  point P0 (33.15, -25.5)
properties part number "DC23[i3][R][1]" material "Aluminio 6061"
